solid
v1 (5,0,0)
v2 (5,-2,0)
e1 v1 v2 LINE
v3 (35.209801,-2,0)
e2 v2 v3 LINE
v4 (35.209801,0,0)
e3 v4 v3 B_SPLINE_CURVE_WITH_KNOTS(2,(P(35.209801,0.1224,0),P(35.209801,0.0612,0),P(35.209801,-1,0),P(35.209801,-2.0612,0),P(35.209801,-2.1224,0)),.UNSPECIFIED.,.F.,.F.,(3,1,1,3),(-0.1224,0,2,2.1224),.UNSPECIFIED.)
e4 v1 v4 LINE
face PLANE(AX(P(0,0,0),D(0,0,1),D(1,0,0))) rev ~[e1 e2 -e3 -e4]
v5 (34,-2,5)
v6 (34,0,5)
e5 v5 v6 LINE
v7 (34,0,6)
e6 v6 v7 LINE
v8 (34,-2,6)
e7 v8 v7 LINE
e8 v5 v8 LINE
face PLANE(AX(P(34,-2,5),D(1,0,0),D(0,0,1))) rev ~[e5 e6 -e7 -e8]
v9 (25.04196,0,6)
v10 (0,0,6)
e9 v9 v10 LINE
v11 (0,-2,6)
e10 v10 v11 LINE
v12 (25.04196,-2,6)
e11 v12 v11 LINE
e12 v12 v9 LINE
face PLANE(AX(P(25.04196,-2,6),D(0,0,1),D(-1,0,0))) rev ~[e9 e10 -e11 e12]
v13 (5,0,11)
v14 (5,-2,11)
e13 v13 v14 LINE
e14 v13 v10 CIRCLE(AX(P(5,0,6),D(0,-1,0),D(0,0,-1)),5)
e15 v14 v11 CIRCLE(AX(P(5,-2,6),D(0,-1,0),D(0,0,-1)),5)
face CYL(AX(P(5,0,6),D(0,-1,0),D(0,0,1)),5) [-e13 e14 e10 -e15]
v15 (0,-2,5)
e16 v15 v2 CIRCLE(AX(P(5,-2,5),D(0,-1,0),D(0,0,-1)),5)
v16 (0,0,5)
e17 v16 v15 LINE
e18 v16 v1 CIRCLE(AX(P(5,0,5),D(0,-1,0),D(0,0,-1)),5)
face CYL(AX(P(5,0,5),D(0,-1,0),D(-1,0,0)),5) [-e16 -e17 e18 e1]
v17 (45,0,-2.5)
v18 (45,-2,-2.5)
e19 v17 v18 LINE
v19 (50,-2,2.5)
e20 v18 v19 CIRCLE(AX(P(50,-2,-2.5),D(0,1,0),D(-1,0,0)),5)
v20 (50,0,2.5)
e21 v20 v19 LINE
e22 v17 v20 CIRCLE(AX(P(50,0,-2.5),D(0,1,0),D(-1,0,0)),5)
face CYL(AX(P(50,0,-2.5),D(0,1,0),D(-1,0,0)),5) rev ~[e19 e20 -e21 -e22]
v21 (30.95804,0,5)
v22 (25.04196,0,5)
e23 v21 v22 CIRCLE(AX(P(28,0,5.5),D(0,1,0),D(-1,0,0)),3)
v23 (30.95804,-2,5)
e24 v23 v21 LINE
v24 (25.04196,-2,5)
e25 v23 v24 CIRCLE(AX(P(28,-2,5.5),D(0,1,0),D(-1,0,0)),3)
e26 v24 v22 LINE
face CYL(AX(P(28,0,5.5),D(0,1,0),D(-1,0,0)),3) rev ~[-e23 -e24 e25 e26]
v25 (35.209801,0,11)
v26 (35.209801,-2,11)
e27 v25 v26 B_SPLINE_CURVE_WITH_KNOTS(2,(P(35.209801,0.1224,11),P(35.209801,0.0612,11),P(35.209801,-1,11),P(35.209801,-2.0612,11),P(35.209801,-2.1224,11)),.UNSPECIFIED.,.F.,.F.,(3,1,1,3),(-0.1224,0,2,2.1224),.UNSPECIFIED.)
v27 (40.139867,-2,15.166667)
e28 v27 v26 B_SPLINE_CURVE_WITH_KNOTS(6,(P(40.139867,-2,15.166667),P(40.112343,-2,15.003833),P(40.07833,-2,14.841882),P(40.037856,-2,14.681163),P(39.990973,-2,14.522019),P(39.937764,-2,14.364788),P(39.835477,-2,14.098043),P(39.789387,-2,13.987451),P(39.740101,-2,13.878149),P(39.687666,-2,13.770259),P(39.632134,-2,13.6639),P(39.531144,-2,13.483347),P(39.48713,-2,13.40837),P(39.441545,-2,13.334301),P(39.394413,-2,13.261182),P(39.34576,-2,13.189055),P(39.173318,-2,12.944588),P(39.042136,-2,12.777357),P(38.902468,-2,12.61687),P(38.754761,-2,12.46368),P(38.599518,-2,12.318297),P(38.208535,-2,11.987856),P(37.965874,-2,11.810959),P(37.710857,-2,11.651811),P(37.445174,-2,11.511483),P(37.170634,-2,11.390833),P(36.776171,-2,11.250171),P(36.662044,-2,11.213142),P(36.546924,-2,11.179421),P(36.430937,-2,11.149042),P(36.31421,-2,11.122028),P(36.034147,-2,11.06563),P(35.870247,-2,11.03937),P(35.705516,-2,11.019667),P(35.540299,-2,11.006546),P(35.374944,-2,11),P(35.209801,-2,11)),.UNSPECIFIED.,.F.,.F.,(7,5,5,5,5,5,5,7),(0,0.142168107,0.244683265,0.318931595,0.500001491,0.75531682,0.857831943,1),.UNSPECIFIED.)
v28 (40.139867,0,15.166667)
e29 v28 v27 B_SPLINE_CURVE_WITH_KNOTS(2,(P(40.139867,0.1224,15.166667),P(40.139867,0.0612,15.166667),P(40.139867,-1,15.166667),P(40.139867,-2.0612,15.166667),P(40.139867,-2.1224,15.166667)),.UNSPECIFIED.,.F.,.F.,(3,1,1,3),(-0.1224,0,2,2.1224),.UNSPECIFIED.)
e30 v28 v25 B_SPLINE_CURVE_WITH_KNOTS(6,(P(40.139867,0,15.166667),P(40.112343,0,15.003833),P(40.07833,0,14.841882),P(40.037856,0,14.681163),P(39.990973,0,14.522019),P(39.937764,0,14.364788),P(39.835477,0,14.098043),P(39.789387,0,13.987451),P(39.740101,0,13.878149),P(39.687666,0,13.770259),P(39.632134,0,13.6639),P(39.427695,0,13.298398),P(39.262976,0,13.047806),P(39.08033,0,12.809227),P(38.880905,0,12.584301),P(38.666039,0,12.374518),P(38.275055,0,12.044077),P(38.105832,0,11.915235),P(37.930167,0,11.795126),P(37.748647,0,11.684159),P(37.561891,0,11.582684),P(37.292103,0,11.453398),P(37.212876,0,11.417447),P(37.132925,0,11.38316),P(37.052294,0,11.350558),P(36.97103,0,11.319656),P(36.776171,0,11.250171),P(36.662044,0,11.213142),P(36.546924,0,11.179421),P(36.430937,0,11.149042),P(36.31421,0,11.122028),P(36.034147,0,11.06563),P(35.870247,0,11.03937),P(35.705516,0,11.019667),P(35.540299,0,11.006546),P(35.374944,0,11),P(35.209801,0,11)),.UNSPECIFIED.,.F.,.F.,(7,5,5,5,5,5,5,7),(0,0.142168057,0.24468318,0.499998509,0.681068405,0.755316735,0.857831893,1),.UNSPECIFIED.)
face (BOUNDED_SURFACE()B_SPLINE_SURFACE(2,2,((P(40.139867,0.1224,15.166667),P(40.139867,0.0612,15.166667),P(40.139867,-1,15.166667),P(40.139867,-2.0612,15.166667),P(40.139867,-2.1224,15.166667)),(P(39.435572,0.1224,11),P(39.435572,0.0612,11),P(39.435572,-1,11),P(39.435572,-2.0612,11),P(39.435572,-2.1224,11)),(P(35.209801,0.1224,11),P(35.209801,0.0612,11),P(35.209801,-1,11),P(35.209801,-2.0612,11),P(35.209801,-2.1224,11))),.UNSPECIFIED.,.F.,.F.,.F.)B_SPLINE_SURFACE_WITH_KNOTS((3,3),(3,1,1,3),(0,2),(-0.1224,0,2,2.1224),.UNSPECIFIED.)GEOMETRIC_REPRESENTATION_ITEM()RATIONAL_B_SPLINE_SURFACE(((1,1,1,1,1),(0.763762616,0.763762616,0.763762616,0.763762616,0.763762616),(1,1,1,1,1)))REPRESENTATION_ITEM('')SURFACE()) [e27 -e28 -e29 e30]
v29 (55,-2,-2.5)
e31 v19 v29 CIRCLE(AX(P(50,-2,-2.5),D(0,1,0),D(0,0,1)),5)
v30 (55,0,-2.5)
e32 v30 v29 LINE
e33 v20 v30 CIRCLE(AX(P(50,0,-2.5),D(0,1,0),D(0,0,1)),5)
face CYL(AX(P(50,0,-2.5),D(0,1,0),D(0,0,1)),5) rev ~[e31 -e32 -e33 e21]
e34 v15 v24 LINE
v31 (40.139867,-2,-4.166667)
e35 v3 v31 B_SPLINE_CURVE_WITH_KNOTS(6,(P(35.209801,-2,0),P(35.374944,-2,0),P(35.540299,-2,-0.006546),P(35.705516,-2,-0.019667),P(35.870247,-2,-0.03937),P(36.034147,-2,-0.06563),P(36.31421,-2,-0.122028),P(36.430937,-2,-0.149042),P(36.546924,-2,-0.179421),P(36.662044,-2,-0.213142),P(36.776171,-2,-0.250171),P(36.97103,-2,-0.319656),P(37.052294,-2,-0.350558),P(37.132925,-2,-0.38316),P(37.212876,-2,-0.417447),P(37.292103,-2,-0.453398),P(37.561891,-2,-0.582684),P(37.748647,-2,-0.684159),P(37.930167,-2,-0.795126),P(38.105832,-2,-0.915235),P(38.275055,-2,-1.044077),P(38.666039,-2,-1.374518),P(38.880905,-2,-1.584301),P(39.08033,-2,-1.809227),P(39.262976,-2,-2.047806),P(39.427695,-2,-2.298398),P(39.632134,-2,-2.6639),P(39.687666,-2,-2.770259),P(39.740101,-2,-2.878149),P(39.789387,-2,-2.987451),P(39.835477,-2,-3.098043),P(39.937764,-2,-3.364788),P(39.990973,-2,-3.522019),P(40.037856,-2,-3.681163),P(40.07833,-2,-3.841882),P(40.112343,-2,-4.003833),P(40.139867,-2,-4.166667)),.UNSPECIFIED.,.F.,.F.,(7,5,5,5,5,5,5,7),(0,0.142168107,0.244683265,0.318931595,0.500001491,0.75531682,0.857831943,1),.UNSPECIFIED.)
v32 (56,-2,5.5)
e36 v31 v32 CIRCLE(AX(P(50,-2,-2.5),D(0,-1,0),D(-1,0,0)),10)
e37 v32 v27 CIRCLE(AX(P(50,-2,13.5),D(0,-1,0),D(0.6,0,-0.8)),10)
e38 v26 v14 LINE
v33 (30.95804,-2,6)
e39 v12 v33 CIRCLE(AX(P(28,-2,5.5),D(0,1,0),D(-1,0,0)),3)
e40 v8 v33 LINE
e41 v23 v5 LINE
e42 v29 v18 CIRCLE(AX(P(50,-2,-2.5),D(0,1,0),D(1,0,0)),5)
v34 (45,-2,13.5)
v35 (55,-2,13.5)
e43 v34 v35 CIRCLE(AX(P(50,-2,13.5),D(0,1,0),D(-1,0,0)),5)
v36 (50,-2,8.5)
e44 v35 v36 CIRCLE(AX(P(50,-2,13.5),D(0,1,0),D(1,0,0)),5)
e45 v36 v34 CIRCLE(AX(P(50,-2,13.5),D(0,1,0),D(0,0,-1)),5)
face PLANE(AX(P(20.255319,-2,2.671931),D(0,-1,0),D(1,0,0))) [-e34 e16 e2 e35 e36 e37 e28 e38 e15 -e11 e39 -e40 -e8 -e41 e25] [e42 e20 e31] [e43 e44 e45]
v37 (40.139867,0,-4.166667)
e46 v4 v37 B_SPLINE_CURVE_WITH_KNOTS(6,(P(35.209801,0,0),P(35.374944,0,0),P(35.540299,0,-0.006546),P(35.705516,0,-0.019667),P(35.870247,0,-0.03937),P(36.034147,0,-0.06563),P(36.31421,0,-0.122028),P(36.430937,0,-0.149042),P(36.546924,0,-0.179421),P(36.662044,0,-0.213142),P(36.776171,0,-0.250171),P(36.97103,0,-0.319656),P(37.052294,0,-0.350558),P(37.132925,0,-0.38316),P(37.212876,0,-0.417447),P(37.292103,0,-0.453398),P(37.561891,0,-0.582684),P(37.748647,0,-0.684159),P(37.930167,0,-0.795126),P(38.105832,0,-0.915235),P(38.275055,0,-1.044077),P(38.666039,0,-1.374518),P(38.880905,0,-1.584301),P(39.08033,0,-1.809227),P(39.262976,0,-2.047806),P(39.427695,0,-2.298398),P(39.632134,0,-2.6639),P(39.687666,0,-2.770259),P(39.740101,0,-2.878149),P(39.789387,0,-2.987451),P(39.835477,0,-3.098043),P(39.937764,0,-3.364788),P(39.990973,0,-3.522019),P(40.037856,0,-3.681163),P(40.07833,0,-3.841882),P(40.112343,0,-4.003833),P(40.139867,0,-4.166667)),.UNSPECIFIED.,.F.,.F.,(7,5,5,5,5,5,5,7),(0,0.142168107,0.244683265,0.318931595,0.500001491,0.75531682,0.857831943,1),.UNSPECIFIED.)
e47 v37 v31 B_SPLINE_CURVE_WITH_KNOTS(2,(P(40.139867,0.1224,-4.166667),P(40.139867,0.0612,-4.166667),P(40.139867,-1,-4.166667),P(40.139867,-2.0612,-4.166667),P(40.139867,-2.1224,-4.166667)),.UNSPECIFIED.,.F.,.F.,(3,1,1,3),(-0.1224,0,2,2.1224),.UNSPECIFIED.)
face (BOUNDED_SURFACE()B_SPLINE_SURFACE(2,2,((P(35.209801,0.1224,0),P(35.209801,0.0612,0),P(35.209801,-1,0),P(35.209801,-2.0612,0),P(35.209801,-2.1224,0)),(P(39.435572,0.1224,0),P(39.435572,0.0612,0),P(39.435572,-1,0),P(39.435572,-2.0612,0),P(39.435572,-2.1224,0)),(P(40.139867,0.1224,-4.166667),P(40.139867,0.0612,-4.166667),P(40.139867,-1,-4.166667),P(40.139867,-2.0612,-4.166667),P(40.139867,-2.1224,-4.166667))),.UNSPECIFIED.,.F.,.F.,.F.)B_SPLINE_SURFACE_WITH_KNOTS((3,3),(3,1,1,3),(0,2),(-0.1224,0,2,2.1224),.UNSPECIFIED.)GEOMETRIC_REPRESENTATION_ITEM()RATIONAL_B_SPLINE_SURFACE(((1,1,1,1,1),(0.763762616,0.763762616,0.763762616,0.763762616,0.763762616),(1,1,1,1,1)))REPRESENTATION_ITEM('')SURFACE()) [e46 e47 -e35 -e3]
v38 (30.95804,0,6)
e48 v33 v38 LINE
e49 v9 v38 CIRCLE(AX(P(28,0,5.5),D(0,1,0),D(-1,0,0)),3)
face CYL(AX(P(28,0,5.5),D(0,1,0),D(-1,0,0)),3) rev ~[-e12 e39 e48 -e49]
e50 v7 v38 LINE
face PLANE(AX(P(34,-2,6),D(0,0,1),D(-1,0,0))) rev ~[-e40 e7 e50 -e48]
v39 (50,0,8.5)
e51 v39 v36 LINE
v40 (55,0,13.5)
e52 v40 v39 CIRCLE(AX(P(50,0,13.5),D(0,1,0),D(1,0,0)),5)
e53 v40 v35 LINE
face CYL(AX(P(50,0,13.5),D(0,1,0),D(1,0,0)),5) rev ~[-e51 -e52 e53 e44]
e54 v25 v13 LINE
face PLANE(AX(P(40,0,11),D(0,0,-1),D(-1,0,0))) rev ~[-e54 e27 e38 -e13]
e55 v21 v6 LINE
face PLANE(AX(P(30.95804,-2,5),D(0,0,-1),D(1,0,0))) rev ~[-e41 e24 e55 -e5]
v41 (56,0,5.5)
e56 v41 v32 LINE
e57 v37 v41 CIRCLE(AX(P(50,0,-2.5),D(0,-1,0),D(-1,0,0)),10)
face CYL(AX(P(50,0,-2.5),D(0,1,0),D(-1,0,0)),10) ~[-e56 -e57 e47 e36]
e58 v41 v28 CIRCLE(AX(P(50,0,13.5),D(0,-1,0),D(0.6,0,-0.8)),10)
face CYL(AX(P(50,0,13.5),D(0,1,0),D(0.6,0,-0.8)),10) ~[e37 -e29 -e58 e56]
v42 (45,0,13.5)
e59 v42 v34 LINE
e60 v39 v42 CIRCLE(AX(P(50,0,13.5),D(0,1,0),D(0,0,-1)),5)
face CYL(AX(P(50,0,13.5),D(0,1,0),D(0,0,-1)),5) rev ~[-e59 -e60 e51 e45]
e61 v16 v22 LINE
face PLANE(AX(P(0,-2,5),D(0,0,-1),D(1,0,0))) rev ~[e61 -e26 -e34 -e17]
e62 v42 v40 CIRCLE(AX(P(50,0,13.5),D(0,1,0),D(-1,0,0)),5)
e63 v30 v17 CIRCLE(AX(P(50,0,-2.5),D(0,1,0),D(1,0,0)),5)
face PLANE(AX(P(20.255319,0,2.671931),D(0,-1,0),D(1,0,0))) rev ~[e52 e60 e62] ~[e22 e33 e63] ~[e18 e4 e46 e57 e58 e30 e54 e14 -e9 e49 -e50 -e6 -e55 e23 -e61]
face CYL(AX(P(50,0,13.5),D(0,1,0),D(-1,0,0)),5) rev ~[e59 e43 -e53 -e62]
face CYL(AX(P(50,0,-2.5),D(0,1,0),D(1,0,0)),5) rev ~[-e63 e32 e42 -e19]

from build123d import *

# Parameters (mm, degrees)
F1_DEPTH = 2
F2_R     = 5
F4_DEPTH = 2


# Not quite as in the source:
# - a feature names something its author has since deleted; it is built from what else it names


with BuildPart() as f1:
    # F0 (on Front) → F1 (new body)
    with BuildSketch(Plane.XZ):
        with BuildLine():
            Line((0, 5.5), (0, 0))
            Line((0, 0), (40, 0))
            Line((40, 0), (40, 5.5))
            Line((40, 5.5), (31, 5.5))
            ThreePointArc((31, 5.5), (28, 2.5), (25, 5.5))
            Line((25, 5.5), (0, 5.5))
        make_face()
        with BuildLine():
            Line((40, 5.5), (40, 0))
            Line((40, 0), (40, -2.5))
            ThreePointArc((40, -2.5), (41.05572809, 1.972135955), (44, 5.5))
            Line((44, 5.5), (40, 5.5))
        make_face()
        with BuildLine():
            Line((0, 11), (0, 5.5))
            Line((0, 5.5), (25, 5.5))
            ThreePointArc((25, 5.5), (28, 8.5), (31, 5.5))
            Line((31, 5.5), (40, 5.5))
            Line((40, 5.5), (40, 11))
            Line((40, 11), (0, 11))
        make_face()
        with BuildLine():
            Line((40, 11), (40, 5.5))
            Line((40, 5.5), (44, 5.5))
            ThreePointArc((44, 5.5), (41.05572809, 9.027864045), (40, 13.5))
            Line((40, 13.5), (40, 11))
        make_face()
        with BuildLine():
            Line((45, -2.5), (40, -2.5))
            ThreePointArc((40, -2.5), (50, -12.5), (60, -2.5))
            ThreePointArc((60, -2.5), (58.94427191, 1.972135955), (56, 5.5))
            ThreePointArc((56, 5.5), (53.1622776602, 4.0131670195), (50, 3.5))
            Line((50, 3.5), (50, 2.5))
            ThreePointArc((50, 2.5), (53.5355339059, 1.0355339059), (55, -2.5))
            ThreePointArc((55, -2.5), (50, -7.5), (45, -2.5))
        make_face()
        with BuildLine():
            ThreePointArc((44, 5.5), (41.05572809, 1.972135955), (40, -2.5))
            Line((40, -2.5), (45, -2.5))
            ThreePointArc((45, -2.5), (46.4644660941, 1.0355339059), (50, 2.5))
            Line((50, 2.5), (50, 3.5))
            ThreePointArc((50, 3.5), (46.8377223398, 4.0131670195), (44, 5.5))
        make_face()
        with BuildLine():
            ThreePointArc((40, 13.5), (41.05572809, 9.027864045), (44, 5.5))
            ThreePointArc((44, 5.5), (46.8377223398, 6.9868329805), (50, 7.5))
            Line((50, 7.5), (50, 8.5))
            ThreePointArc((50, 8.5), (46.4644660941, 9.9644660941), (45, 13.5))
            Line((45, 13.5), (40, 13.5))
        make_face()
        with BuildLine():
            Line((50, 5.5), (44, 5.5))
            ThreePointArc((44, 5.5), (46.8377223398, 4.0131670195), (50, 3.5))
            Line((50, 3.5), (50, 5.5))
        make_face()
        with BuildLine():
            ThreePointArc((50, 7.5), (46.8377223398, 6.9868329805), (44, 5.5))
            Line((44, 5.5), (50, 5.5))
            Line((50, 5.5), (50, 7.5))
        make_face()
        with BuildLine():
            ThreePointArc((60, 13.5), (50, 23.5), (40, 13.5))
            Line((40, 13.5), (45, 13.5))
            ThreePointArc((45, 13.5), (50, 18.5), (55, 13.5))
            ThreePointArc((55, 13.5), (53.5355339059, 9.9644660941), (50, 8.5))
            Line((50, 8.5), (50, 7.5))
            ThreePointArc((50, 7.5), (53.1622776602, 6.9868329805), (56, 5.5))
            ThreePointArc((56, 5.5), (58.94427191, 9.027864045), (60, 13.5))
        make_face()
        with BuildLine():
            ThreePointArc((56, 5.5), (53.1622776602, 6.9868329805), (50, 7.5))
            Line((50, 7.5), (50, 5.5))
            Line((50, 5.5), (56, 5.5))
        make_face()
        with BuildLine():
            Line((50, 5.5), (50, 3.5))
            ThreePointArc((50, 3.5), (53.1622776602, 4.0131670195), (56, 5.5))
            Line((56, 5.5), (50, 5.5))
        make_face()
    extrude(amount=F1_DEPTH)

    # F2
    f2_edges = [f1.edges().sort_by_distance(p)[0] for p in [
        (40, -1, 11),
        (40, -1, 0),
        (0, -1, 11),
        (0, -1, 0),
    ]]
    fillet(f2_edges, radius=F2_R)

    # F3 (on face) → F4 (cut, through all)
    with BuildSketch(Plane.XZ.offset(2)):
        with BuildLine():
            Line((25.0419601085, 6), (0, 6))
            Line((0, 6), (0, 5))
            Line((0, 5), (25.0419601085, 5))
            ThreePointArc((25.0419601085, 5), (25, 5.5), (25.0419601085, 6))
        make_face()
        with BuildLine():
            Line((34, 6), (30.9580398915, 6))
            ThreePointArc((30.9580398915, 6), (30.9894915684, 5.7508787808), (31, 5.5))
            ThreePointArc((31, 5.5), (30.9894915684, 5.2491212192), (30.9580398915, 5))
            Line((30.9580398915, 5), (34, 5))
            Line((34, 5), (34, 6))
        make_face()
    extrude(amount=-F4_DEPTH, mode=Mode.SUBTRACT)


solid = f1.part
